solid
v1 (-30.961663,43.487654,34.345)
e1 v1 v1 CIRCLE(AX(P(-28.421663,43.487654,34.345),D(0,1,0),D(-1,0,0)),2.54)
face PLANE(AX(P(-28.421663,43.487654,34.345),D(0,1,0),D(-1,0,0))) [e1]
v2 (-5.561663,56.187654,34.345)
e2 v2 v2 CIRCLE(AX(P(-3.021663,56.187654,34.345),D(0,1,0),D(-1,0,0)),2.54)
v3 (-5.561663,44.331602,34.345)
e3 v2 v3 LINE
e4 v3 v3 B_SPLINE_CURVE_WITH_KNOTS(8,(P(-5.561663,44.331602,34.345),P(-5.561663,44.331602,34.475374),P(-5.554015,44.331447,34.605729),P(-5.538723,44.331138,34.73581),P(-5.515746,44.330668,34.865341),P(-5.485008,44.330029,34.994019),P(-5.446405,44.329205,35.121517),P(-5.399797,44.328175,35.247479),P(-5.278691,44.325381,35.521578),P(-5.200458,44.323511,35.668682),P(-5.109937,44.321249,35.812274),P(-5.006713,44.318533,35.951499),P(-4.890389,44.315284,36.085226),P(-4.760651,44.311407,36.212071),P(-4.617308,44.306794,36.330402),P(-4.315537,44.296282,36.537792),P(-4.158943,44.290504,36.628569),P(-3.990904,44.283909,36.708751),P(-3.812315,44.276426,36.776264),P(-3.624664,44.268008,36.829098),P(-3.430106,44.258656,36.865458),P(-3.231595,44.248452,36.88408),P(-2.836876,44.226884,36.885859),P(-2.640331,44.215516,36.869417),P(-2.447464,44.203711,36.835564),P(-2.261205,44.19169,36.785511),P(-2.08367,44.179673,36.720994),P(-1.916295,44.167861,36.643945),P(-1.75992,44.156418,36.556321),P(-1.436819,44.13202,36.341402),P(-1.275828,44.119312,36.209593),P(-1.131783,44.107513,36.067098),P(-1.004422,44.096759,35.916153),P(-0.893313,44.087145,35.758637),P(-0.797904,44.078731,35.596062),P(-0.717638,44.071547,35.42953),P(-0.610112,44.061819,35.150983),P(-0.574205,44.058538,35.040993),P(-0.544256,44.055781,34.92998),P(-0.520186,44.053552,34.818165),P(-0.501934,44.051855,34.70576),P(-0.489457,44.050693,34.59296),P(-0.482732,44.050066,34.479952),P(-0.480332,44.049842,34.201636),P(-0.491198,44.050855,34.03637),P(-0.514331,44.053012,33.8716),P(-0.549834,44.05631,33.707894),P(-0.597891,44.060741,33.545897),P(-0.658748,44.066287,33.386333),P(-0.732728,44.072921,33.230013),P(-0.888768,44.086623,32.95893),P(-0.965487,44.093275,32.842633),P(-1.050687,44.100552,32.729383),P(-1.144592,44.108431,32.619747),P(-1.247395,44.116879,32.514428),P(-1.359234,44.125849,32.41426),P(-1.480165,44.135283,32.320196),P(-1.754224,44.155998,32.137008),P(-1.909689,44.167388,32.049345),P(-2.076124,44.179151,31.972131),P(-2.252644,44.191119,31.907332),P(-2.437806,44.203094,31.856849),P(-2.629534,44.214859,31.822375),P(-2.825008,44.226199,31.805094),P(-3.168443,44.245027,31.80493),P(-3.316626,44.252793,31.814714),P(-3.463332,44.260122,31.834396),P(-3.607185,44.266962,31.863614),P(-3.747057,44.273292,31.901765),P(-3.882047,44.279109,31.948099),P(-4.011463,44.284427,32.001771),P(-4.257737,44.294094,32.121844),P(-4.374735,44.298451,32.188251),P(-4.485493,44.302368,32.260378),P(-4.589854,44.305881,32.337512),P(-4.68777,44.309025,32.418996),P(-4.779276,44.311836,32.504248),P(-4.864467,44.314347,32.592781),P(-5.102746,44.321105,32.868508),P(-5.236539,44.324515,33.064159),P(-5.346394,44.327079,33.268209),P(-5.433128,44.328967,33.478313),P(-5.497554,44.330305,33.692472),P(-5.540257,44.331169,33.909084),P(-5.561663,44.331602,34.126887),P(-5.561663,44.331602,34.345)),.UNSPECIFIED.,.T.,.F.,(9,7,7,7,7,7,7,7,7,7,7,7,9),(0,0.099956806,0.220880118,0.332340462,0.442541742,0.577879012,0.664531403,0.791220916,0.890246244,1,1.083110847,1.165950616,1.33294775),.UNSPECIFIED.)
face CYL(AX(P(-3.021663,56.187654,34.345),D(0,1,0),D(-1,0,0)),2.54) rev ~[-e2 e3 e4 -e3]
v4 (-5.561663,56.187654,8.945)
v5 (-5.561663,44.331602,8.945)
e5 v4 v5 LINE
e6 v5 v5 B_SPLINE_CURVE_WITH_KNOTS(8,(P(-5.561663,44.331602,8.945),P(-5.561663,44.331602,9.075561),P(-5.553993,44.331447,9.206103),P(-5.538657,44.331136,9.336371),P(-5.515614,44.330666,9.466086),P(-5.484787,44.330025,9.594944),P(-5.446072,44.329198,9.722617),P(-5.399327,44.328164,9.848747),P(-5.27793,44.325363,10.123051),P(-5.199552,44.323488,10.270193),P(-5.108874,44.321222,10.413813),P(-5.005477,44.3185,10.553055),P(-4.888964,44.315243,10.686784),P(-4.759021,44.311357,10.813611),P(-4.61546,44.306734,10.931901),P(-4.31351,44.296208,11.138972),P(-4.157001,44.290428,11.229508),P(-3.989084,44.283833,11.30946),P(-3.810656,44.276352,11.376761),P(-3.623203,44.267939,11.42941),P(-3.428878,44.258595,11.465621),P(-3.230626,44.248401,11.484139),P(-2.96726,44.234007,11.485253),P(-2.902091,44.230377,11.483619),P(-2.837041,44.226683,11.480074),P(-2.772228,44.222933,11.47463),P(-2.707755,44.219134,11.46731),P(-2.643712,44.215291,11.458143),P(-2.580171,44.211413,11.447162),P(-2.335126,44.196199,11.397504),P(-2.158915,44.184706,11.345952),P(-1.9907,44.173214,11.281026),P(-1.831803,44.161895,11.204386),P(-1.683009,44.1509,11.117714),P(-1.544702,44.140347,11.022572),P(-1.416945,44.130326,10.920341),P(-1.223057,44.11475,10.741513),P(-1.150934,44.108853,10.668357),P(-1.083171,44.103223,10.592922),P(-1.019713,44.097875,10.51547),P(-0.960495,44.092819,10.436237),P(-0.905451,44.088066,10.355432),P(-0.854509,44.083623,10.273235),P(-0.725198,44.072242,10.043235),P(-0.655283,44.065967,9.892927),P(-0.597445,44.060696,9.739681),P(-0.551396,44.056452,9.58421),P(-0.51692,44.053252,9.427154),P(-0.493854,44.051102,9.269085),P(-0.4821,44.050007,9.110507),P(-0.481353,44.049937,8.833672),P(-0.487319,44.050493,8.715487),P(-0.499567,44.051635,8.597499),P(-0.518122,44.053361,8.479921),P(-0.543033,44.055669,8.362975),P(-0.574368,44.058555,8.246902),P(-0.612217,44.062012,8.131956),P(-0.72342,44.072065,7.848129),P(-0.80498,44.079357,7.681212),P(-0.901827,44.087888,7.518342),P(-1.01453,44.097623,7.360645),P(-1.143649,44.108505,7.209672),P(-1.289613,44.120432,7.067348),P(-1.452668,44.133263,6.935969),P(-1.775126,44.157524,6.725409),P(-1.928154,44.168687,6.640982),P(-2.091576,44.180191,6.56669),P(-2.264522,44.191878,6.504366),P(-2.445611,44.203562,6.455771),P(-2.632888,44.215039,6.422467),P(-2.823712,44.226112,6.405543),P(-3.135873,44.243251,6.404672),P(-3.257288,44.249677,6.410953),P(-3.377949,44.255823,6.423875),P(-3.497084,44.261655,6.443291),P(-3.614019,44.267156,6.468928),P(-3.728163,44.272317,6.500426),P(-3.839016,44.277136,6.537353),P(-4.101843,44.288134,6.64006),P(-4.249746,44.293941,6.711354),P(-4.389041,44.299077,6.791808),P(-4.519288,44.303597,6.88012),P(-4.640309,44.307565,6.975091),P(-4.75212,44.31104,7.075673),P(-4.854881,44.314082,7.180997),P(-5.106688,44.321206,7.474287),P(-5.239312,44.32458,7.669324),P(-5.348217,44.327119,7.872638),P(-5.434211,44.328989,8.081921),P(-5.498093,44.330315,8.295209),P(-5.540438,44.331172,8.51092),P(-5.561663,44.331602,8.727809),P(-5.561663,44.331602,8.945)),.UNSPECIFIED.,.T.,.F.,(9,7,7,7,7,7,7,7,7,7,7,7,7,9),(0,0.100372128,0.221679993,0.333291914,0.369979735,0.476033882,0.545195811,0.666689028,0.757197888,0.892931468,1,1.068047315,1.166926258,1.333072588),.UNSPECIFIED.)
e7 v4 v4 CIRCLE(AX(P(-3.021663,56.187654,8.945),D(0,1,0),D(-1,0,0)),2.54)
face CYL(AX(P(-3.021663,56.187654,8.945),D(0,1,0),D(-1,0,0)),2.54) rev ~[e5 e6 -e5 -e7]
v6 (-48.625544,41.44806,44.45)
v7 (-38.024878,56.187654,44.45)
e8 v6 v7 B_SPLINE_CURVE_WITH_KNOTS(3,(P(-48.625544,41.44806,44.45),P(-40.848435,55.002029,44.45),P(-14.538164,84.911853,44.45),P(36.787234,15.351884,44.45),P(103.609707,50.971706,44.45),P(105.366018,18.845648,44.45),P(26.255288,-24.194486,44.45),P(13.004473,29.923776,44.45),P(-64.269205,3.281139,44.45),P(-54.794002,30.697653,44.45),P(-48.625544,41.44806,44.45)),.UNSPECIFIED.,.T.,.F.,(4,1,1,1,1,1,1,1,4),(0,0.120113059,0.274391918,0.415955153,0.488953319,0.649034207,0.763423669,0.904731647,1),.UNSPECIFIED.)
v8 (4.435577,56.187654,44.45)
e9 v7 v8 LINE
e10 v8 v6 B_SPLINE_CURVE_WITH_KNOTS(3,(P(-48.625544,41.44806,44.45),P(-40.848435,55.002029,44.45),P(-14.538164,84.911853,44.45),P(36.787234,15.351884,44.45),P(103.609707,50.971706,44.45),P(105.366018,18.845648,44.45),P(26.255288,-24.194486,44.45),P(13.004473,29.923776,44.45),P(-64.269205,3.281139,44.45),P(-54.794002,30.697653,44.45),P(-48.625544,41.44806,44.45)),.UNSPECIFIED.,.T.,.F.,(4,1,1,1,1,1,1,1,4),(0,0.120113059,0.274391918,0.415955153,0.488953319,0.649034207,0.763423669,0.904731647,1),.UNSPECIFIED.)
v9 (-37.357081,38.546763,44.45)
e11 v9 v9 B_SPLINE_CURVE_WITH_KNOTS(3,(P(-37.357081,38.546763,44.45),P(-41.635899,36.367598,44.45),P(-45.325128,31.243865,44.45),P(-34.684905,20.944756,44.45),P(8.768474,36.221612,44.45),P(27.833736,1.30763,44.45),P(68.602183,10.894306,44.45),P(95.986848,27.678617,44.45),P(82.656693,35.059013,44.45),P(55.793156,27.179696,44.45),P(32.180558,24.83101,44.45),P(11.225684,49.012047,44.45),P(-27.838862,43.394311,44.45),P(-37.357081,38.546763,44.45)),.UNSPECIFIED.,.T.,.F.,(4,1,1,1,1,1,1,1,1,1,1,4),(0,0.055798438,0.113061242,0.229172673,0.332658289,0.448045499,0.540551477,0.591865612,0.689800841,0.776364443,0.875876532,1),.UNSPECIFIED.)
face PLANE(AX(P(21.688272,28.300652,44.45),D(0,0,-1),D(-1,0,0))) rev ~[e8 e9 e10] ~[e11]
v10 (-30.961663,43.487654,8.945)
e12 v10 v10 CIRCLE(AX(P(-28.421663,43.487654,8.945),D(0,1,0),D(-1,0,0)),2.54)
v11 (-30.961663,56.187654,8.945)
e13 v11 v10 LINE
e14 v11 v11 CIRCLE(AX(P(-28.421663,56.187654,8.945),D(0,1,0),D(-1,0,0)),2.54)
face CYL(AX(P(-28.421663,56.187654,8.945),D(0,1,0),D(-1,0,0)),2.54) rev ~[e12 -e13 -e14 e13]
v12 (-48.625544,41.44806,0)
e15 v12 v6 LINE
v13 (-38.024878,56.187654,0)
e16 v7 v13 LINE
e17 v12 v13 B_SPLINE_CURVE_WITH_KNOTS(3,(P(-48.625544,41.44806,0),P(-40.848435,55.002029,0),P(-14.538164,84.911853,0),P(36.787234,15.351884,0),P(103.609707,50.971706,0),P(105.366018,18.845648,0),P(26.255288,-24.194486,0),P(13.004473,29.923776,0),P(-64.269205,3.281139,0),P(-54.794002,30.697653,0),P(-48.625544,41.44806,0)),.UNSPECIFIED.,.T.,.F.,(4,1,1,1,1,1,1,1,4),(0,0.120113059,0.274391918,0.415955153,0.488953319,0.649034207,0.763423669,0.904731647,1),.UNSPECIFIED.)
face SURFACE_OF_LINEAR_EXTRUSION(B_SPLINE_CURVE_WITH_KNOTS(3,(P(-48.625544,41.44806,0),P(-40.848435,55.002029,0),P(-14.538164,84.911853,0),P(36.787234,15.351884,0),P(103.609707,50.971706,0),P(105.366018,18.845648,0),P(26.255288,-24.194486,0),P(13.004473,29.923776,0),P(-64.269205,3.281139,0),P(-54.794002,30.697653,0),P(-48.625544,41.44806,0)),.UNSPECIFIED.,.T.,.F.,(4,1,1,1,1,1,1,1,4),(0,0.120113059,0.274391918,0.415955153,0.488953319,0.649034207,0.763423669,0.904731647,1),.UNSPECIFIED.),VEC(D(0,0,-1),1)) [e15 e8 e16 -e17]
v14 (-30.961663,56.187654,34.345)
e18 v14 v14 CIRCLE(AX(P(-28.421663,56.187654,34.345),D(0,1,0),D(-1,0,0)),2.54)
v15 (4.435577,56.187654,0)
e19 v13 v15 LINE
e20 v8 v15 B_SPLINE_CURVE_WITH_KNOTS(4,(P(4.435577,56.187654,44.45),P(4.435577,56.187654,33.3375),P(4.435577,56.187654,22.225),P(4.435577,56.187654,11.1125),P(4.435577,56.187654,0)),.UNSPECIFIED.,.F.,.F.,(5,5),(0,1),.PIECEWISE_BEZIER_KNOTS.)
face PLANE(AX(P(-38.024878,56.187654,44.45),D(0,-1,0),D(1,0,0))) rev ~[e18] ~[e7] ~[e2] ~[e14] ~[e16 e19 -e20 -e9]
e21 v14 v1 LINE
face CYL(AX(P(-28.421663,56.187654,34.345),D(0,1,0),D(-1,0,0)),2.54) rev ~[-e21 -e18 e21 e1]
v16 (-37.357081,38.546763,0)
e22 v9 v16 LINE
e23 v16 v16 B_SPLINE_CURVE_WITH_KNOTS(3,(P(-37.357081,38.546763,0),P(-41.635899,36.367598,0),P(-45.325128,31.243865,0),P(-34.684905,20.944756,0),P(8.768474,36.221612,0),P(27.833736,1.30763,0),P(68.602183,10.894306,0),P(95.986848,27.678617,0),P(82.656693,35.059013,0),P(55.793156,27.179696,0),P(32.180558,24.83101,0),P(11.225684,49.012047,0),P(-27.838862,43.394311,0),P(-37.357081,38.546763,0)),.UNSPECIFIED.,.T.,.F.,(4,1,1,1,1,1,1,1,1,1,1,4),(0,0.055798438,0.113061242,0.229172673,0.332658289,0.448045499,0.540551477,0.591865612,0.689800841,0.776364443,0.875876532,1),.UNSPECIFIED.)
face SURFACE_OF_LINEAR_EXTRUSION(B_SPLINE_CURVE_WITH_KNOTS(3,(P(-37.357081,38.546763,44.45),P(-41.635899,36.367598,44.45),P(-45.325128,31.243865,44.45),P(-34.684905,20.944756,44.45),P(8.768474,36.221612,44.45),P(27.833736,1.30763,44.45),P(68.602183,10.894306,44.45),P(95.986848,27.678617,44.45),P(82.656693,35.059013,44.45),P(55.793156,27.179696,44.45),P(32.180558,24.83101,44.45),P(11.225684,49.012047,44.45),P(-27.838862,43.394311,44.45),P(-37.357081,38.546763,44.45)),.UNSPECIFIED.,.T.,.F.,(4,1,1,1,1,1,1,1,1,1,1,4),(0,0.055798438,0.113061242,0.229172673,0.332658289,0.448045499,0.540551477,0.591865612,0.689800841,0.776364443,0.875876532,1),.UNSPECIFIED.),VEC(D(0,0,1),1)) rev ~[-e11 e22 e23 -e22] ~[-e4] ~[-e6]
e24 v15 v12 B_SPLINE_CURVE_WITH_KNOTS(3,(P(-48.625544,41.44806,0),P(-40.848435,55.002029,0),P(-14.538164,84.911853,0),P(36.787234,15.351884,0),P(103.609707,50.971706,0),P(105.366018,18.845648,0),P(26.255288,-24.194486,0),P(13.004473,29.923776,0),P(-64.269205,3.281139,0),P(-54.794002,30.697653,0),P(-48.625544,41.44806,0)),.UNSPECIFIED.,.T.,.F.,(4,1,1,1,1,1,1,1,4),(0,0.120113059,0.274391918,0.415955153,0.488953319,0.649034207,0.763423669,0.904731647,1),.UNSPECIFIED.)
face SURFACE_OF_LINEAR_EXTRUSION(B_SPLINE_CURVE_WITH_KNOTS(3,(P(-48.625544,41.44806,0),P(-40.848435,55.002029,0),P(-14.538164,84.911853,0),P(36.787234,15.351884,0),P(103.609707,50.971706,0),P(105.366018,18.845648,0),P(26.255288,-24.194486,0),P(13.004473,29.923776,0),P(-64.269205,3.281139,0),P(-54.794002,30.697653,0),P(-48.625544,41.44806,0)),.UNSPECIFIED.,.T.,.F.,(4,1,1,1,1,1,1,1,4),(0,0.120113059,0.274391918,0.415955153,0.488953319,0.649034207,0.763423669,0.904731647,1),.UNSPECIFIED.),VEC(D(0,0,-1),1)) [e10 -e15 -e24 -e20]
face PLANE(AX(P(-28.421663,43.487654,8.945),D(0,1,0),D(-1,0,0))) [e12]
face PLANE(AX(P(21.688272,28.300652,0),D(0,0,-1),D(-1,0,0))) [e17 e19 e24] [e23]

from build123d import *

# Parameters (mm, degrees)
F1_DEPTH = 44.45
F2_W     = 74.2719661038
F2_H     = 19.1847047539
F3_DEPTH = 44.45
F4_R     = 2.54
F5_DEPTH = 12.7
F7_DEPTH = 44.45


with BuildPart() as f1:
    # F0 (on Top) → F1 (new body)
    with BuildSketch(Plane.XY):
        with BuildLine():
            add(Edge.make_bspline(
                [(-48.6255437136, 41.4480604231), (-40.8484346021, 55.0020290598), (-14.5381640102, 84.9118531153), (36.7872341853, 15.3518841758), (103.6097074974, 50.9717063324), (105.366018034, 18.8456481989), (26.2552876949, -24.1944861357), (13.0044728222, 29.9237755732), (-64.2692054709, 3.2811392732), (-54.7940018694, 30.6976534039), (-48.6255437136, 41.4480604231)],
                knots=[0, 0, 0, 0, 0.1201130587, 0.2743919181, 0.4159551531, 0.4889533194, 0.6490342071, 0.7634236695, 0.9047316469, 1, 1, 1, 1], degree=3))
        make_face()
    extrude(amount=F1_DEPTH)

    # F2 (on face) → F3 (cut)
    with BuildSketch(Plane.XY.offset(44.45)):
        with Locations((-0.8888949474, 65.780006769)):
            Rectangle(F2_W, F2_H)
    extrude(amount=-F3_DEPTH, mode=Mode.SUBTRACT)

    # F4 (on face) → F5 (cut)
    with BuildSketch(Plane(origin=(0, 56.187654392, 0), x_dir=(-1, 0, 0), z_dir=(0, 1, 0))):
        with Locations((28.4216627479, 8.9450003579)):
            Circle(F4_R)
        with Locations((28.4216627479, 34.3450003579)):
            Circle(F4_R)
        with Locations((3.0216627479, 8.9450003579)):
            Circle(F4_R)
        with Locations((3.0216627479, 34.3450003579)):
            Circle(F4_R)
    extrude(amount=-F5_DEPTH, mode=Mode.SUBTRACT)

    # F6 (on face) → F7 (cut, through all)
    with BuildSketch(Plane.XY.offset(44.45)):
        with BuildLine():
            add(Edge.make_bspline(
                [(-37.3570807278, 38.5467633605), (-41.6358987226, 36.3675978685), (-45.3251278471, 31.2438646318), (-34.6849049278, 20.9447558378), (8.7684742603, 36.2216119824), (27.8337360027, 1.3076300709), (68.6021829277, 10.8943057633), (95.9868479622, 27.6786171098), (82.6566932331, 35.0590130187), (55.7931561454, 27.179696289), (32.1805583139, 24.8310097681), (11.2256838696, 49.0120466754), (-27.8388621677, 43.3943108507), (-37.3570807278, 38.5467633605)],
                knots=[0, 0, 0, 0, 0.0557984382, 0.1130612418, 0.2291726734, 0.3326582888, 0.4480454993, 0.540551477, 0.5918656122, 0.6898008412, 0.776364443, 0.8758765316, 1, 1, 1, 1], degree=3))
        make_face()
    extrude(amount=-F7_DEPTH, mode=Mode.SUBTRACT)


solid = f1.part
